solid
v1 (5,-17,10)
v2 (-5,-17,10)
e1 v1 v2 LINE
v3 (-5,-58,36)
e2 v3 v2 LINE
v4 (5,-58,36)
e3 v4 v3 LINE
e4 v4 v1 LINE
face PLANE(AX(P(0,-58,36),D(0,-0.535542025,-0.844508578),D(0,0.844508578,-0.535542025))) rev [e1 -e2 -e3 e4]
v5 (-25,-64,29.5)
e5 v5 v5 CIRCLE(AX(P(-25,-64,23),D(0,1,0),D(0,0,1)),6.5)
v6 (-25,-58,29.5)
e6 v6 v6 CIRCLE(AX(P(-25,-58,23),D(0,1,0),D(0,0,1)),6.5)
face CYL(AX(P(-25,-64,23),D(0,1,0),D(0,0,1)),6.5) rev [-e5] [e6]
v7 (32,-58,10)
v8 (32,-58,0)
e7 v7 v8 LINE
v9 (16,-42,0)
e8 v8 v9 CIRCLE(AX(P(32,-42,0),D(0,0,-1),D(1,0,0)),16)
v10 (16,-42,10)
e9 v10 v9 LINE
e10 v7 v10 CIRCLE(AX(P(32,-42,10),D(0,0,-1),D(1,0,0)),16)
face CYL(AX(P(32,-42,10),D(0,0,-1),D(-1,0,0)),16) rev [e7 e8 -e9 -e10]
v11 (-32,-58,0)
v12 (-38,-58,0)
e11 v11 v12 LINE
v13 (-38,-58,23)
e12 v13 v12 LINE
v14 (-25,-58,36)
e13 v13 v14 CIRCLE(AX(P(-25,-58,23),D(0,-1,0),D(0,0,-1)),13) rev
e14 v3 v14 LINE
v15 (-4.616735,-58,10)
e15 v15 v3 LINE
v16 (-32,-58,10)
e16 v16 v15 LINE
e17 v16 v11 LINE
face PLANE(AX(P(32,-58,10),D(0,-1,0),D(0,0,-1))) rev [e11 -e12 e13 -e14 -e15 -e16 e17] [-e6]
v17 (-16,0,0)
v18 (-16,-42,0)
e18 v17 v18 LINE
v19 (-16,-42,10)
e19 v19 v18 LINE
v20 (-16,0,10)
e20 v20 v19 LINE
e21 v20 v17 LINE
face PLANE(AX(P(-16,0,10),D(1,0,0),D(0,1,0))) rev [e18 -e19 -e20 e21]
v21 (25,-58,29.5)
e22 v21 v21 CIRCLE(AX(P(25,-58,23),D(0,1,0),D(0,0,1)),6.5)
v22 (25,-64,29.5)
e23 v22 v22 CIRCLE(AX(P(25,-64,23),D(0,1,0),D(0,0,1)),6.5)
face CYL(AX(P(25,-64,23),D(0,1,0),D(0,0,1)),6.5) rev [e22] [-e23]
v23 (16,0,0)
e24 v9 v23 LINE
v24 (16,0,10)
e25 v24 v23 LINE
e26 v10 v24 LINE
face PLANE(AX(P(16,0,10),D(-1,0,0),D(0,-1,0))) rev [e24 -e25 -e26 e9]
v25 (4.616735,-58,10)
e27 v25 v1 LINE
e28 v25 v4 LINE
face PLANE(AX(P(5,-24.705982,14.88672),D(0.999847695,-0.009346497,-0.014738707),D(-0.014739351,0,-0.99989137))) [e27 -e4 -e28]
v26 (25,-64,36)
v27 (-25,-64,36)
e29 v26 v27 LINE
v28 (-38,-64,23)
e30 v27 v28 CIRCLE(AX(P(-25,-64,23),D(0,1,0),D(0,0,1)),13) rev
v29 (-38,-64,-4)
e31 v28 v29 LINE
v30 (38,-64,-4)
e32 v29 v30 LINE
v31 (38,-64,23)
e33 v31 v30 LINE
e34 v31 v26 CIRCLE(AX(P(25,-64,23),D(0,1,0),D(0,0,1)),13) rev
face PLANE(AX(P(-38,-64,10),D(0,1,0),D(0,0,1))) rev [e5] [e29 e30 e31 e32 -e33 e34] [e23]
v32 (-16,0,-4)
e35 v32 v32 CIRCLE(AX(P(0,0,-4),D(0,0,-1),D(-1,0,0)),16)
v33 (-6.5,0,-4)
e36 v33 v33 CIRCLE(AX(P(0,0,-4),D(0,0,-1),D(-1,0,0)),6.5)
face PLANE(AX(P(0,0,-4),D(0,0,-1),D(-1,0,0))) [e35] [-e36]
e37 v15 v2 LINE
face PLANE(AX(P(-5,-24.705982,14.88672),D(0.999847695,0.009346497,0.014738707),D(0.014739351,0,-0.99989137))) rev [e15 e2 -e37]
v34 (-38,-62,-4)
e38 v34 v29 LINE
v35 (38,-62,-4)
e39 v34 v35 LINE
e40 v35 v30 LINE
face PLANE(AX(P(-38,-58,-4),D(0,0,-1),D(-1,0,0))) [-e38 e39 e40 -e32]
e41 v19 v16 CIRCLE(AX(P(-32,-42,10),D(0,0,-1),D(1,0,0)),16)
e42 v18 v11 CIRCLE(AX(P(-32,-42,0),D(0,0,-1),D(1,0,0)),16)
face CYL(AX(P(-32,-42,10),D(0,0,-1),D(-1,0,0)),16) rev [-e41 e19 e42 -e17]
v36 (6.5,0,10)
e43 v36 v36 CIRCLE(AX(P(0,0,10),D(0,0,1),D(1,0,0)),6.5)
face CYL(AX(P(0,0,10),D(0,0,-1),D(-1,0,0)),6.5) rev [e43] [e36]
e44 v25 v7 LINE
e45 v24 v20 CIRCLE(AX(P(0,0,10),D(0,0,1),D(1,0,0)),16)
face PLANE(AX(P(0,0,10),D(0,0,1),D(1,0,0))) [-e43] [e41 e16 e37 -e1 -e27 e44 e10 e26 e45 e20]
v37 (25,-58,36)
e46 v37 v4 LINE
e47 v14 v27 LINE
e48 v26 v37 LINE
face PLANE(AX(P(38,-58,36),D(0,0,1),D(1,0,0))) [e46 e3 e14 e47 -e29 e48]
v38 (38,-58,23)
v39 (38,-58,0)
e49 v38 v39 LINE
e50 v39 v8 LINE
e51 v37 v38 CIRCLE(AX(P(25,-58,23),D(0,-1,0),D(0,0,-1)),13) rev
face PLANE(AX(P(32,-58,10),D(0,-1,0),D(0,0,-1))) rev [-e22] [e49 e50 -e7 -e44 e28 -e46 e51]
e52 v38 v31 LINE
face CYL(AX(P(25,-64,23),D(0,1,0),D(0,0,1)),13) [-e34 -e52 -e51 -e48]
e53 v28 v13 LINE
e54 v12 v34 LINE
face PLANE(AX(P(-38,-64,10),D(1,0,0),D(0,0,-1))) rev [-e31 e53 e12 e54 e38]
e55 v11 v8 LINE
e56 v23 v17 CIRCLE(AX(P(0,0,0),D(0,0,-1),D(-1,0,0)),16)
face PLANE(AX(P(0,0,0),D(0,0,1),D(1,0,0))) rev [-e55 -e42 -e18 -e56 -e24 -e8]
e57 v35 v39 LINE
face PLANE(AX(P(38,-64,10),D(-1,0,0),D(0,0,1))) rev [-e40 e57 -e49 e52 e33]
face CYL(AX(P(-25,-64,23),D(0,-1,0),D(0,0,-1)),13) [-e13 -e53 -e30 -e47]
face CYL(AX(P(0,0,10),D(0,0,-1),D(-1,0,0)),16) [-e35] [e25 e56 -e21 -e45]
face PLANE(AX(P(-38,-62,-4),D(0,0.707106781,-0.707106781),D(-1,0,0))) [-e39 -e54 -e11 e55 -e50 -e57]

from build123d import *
from build123d.topology import SkipClean

# Parameters (mm, degrees)
CROQUIS1_R              = 6.5
SALIENTE_EXTRUIR1_DEPTH = 10
SALIENTE_EXTRUIR2_START = 4
CROQUIS2_R              = 16
SALIENTE_EXTRUIR2_DEPTH = 4
CROQUIS3_R              = 6.5
CORTAR_EXTRUIR1_DEPTH   = 4
SALIENTE_EXTRUIR3_DEPTH = 6
NERVIO1_REACH           = 84.68
CROQUIS5_WALL_W         = 215.909157244
CROQUIS5_WALL_H         = 10
NERVIO1_DRAFT_ANGLE     = -1
CHAFL_N3_SIZE           = 4
REDONDEO1_R             = 13
REDONDEO2_R             = 13
CROQUIS6_R              = 6.5
CORTAR_EXTRUIR2_DEPTH   = 6


with BuildPart() as part:
    # Croquis1 → Saliente-Extruir1 (new body)
    with BuildSketch(Plane.XY):
        with BuildLine():
            Line((-16, 0), (-16, -42))
            ThreePointArc((-16, -42), (-20.686291501, -53.313708499), (-32, -58))
            Line((-32, -58), (-38, -58))
            Line((-38, -58), (-38, -64))
            Line((-38, -64), (38, -64))
            Line((38, -64), (38, -58))
            Line((38, -58), (32, -58))
            ThreePointArc((32, -58), (20.686291501, -53.313708499), (16, -42))
            Line((16, -42), (16, 0))
            ThreePointArc((16, 0), (0, 16), (-16, 0))
        make_face()
        Circle(CROQUIS1_R, mode=Mode.SUBTRACT)
    extrude(amount=SALIENTE_EXTRUIR1_DEPTH)

    # Croquis2 → Saliente-Extruir2 (add)
    with SkipClean():  # the faces are left unmerged after this step: merging them gives an invalid solid
        with BuildSketch(Plane(origin=(0, 0, 0), x_dir=(-1, 0, 0), z_dir=(0, 0, -1)).offset(SALIENTE_EXTRUIR2_START)):
            Circle(CROQUIS2_R)
        extrude(amount=-SALIENTE_EXTRUIR2_DEPTH)

    # Croquis3 → Cortar-Extruir1 (cut)
    with SkipClean():  # the faces are left unmerged after this step: merging them gives an invalid solid
        with BuildSketch(Plane(origin=(0, 0, -4), x_dir=(-1, 0, 0), z_dir=(0, 0, -1))):
            Circle(CROQUIS3_R)
        extrude(amount=-CORTAR_EXTRUIR1_DEPTH, mode=Mode.SUBTRACT)

    # Croquis4 → Saliente-Extruir3 (add)
    with SkipClean():  # the faces are left unmerged after this step: merging them gives an invalid solid
        with BuildSketch(Plane.XZ.offset(64)):
            Polygon((38, 0), (38, 36), (-38, 36), (-38, -4), (38, -4), align=None)
        extrude(amount=-SALIENTE_EXTRUIR3_DEPTH)

    # Croquis5 wall → Nervio1 (add, up to next)
    with BuildSketch(Plane(origin=(0, -37.5, 23), x_dir=(0, 0.84450857845, -0.535542025358), z_dir=(0, 0.535542025358, 0.84450857845)), mode=Mode.PRIVATE) as nervio1_sk1:
        Rectangle(CROQUIS5_WALL_W, CROQUIS5_WALL_H)
    nervio1_tool1 = extrude(nervio1_sk1.sketch, amount=-NERVIO1_REACH, mode=Mode.PRIVATE) - part.part
    add(nervio1_tool1.solids().sort_by_distance((0, -37.5, 23))[0])

    # Nervio1 draft
    nervio1_draft_faces = [part.faces().sort_by_distance(p)[0] for p in [
        (-5, -37.767771013, 22.577745711),
        (5, -37.767771013, 22.577745711),
    ]]
    draft(nervio1_draft_faces, Plane(origin=(0, -37.5, 23), x_dir=(0, 0.84450857845, -0.535542025358), z_dir=(0, 0.535542025358, 0.84450857845)), NERVIO1_DRAFT_ANGLE)

    # Chaflán3
    chafl_n3_edges = [part.edges().sort_by_distance(p)[0] for p in [
        (0, -58, -4),
    ]]
    chamfer(chafl_n3_edges, length=CHAFL_N3_SIZE - 0.0001)  # a hair under: the kernel refuses the full size

    # Redondeo1
    redondeo1_edges = [part.edges().sort_by_distance(p)[0] for p in [
        (-38, -61, 36),
    ]]
    fillet(redondeo1_edges, radius=REDONDEO1_R)

    # Redondeo2
    redondeo2_edges = [part.edges().sort_by_distance(p)[0] for p in [
        (38, -61, 36),
    ]]
    fillet(redondeo2_edges, radius=REDONDEO2_R)

    # Croquis6 → Cortar-Extruir2 (cut)
    with BuildSketch(Plane(origin=(0, -58, 0), x_dir=(1, 0, 0), z_dir=(0, 1, 0))):
        with Locations(Location((-25, -23, 0), (0, 0, 270))):
            Circle(CROQUIS6_R)
        with Locations(Location((25, -23, 0), (0, 0, 270))):
            Circle(CROQUIS6_R)
    extrude(amount=-CORTAR_EXTRUIR2_DEPTH, mode=Mode.SUBTRACT)


solid = part.part
